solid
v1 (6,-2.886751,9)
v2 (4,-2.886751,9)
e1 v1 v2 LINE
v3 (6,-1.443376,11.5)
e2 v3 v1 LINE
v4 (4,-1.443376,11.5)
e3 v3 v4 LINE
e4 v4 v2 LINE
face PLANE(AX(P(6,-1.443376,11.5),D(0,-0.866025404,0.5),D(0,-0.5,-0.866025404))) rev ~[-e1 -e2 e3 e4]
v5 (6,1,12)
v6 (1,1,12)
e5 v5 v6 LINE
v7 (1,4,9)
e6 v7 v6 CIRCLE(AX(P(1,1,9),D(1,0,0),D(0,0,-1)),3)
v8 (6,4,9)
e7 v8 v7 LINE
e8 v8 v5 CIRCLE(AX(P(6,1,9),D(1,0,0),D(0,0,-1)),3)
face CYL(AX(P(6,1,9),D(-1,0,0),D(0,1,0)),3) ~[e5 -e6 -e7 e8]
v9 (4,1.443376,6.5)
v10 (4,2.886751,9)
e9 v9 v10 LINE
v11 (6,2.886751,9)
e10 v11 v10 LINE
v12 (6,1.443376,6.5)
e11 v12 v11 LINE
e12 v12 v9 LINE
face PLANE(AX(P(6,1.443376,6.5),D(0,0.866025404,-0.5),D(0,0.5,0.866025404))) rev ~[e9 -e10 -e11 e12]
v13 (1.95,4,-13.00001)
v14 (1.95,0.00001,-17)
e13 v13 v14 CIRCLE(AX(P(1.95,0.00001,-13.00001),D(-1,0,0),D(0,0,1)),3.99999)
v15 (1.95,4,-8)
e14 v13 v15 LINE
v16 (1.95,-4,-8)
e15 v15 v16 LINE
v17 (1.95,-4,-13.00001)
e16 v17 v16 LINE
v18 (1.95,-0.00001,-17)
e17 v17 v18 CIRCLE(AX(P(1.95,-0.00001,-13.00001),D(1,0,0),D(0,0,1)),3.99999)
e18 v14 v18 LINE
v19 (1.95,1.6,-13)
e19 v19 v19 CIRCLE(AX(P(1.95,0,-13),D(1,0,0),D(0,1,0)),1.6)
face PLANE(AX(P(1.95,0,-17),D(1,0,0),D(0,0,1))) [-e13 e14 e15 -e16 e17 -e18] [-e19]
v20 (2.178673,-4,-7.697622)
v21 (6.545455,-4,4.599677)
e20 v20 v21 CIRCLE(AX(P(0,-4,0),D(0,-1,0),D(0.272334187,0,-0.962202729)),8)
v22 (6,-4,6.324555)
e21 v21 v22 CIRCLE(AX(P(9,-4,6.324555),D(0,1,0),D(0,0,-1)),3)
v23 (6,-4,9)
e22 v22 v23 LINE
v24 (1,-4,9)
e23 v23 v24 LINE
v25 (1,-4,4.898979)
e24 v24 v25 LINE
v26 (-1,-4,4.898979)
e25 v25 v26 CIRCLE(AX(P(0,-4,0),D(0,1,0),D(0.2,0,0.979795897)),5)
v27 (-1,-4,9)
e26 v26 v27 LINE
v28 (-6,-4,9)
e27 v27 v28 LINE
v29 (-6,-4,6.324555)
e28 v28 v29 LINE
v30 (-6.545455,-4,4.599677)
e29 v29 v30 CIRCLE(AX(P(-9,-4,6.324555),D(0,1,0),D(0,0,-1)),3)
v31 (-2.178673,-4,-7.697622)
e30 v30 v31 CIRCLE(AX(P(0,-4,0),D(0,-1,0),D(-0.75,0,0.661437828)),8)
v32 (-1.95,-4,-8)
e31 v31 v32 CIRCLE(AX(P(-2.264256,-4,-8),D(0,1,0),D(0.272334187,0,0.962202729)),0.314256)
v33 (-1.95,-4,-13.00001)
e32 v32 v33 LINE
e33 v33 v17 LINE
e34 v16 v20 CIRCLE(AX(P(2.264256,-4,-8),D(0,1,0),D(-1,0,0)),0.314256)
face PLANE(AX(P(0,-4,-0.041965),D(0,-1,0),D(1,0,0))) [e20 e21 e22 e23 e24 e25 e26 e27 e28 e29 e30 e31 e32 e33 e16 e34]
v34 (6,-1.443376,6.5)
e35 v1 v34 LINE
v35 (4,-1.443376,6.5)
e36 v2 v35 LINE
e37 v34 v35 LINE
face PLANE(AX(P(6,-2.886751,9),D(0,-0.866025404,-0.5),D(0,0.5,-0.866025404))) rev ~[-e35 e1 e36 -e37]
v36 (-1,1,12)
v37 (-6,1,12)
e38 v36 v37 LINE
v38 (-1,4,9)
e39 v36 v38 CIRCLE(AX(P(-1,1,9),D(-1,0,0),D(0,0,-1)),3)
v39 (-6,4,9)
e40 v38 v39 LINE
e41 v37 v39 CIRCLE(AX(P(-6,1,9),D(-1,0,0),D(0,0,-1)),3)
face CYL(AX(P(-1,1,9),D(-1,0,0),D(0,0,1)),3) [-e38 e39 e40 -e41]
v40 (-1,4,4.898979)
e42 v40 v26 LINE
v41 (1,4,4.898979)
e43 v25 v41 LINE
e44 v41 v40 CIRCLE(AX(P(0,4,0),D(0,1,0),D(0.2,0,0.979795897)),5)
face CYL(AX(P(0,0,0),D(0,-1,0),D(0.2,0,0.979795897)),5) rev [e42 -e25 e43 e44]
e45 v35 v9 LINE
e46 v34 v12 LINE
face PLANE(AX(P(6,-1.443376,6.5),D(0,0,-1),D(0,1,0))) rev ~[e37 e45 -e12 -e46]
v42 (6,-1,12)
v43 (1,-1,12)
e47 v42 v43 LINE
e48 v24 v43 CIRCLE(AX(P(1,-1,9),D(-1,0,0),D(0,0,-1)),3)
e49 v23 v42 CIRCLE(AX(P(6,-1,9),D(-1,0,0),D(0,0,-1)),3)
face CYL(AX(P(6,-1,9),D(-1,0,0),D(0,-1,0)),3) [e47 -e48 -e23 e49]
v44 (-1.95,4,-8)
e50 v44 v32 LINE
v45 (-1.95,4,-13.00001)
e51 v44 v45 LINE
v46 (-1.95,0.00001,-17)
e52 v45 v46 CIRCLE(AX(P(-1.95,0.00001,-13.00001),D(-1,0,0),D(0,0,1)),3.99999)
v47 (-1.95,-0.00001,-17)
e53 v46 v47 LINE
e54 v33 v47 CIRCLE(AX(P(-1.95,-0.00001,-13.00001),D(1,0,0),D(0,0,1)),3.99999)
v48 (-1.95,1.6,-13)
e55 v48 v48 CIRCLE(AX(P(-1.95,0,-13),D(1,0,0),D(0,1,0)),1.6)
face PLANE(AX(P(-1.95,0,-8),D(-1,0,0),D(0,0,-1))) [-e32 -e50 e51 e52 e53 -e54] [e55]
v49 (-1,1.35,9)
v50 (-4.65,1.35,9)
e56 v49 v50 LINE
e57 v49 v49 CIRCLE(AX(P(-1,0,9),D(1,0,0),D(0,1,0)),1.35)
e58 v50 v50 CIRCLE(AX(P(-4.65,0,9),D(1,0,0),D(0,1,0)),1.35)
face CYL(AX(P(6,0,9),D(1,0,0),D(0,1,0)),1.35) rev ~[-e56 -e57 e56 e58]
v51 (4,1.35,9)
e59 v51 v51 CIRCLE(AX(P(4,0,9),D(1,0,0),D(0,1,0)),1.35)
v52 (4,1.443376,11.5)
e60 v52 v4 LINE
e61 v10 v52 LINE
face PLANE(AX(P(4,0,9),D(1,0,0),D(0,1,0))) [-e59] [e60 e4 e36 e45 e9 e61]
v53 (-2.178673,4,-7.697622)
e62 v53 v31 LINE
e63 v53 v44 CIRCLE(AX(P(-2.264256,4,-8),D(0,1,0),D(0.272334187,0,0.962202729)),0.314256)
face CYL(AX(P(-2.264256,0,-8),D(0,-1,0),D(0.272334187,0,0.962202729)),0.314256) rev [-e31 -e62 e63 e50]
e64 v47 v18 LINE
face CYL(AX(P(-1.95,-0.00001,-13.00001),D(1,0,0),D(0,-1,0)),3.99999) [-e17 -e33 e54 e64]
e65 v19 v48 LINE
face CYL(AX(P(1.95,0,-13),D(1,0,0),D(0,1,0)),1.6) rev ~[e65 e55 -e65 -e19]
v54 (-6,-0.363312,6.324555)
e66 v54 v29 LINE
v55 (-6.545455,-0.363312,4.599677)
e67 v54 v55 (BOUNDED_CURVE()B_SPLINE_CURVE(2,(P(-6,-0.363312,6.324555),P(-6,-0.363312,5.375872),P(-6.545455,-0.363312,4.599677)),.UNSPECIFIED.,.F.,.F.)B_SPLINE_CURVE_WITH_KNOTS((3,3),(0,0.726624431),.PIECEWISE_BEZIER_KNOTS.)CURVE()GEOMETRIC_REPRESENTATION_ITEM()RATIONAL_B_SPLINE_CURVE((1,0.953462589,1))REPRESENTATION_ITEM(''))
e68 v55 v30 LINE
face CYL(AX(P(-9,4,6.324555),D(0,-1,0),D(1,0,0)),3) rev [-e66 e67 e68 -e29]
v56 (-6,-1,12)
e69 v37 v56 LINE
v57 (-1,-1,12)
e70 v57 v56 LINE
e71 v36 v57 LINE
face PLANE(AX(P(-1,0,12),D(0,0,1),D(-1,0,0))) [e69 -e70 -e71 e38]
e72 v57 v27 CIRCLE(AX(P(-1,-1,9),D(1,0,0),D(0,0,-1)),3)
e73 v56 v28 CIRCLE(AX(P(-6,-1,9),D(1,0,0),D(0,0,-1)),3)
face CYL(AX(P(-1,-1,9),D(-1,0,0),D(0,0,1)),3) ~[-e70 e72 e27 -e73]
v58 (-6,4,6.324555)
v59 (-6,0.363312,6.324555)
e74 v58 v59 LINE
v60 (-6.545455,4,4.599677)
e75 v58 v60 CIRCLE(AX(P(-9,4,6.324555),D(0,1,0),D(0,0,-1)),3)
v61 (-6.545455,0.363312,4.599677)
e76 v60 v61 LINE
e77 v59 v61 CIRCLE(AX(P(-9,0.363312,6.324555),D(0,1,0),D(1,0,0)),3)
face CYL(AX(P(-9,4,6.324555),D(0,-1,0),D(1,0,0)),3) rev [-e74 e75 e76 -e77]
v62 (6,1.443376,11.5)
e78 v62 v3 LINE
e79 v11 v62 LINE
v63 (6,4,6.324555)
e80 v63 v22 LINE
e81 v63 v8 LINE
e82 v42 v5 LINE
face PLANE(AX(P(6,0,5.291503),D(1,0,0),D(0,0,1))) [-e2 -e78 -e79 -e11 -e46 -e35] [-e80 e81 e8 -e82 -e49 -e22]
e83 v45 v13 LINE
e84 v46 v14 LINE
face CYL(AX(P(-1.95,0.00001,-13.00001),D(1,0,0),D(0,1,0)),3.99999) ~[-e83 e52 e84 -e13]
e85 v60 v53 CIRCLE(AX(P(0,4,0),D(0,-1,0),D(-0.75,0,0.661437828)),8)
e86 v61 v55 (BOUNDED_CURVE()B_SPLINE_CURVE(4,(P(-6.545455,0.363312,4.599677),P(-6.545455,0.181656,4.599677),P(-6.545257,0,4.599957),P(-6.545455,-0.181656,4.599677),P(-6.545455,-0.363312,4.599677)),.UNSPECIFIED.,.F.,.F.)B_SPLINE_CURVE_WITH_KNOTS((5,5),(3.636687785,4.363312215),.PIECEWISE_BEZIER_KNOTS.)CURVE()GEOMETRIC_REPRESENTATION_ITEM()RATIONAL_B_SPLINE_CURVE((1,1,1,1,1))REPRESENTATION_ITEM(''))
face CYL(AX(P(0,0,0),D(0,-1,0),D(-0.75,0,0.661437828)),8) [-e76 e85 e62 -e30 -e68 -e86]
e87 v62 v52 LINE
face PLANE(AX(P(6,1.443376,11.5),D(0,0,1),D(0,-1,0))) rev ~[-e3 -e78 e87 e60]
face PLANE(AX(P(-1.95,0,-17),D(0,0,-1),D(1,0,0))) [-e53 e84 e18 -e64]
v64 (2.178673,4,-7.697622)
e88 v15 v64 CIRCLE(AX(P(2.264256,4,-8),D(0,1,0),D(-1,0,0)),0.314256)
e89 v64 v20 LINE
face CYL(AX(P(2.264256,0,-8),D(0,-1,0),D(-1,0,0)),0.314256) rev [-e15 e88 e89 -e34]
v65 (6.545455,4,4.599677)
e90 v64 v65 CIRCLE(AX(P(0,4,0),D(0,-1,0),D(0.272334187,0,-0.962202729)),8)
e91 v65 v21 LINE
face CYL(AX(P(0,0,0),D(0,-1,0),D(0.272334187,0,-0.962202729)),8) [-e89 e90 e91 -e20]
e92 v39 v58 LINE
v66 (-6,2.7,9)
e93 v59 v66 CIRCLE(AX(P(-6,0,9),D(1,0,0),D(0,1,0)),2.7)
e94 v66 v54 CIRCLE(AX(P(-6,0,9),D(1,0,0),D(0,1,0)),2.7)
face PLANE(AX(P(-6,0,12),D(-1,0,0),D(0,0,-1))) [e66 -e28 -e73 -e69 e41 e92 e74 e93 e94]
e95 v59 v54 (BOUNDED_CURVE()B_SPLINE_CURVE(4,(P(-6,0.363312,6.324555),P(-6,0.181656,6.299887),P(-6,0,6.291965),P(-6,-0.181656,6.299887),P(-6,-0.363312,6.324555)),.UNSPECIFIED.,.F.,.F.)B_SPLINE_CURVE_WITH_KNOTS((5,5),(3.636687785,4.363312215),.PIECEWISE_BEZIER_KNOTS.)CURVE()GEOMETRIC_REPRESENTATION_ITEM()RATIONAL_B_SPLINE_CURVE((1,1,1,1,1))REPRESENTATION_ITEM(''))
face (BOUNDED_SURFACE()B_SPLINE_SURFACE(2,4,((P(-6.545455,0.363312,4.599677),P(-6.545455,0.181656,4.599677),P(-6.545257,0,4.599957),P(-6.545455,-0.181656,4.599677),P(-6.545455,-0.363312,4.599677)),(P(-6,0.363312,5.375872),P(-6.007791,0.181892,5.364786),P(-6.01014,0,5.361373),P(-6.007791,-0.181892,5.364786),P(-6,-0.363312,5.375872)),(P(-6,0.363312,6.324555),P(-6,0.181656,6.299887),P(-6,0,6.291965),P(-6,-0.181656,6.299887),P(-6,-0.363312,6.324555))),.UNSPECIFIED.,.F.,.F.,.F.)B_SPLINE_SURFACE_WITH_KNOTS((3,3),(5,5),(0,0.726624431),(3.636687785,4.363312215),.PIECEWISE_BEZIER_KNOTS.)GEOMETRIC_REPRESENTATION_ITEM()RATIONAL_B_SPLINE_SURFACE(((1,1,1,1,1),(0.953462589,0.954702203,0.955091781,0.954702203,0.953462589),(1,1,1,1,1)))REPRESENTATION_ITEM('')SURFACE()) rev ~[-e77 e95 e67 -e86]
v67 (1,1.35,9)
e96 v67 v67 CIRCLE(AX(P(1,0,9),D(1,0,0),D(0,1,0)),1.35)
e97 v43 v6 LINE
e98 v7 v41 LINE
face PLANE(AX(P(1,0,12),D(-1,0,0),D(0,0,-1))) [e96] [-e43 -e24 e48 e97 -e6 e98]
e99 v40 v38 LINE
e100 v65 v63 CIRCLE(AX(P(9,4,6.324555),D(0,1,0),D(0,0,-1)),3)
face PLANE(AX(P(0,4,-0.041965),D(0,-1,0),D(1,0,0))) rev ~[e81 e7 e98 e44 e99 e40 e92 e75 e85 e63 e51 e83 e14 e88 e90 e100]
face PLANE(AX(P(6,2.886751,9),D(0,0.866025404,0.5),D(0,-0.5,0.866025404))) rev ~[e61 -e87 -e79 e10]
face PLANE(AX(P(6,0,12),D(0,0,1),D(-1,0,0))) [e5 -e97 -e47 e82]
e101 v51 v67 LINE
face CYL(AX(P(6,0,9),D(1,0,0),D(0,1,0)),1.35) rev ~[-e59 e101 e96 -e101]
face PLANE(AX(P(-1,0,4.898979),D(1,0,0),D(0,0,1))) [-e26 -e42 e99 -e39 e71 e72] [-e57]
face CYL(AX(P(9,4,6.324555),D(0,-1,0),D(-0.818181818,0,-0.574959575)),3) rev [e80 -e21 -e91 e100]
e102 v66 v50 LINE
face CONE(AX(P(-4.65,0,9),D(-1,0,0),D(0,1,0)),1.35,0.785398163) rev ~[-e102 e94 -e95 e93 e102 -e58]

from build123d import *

# Parameters (mm, degrees)
F1_DEPTH = 4
F2_R     = 1.35
F3_DEPTH = 25
F4_DEPTH = 2
F5_R     = 1.6
F6_DEPTH = 25
F7_SIZE  = 1.35
F8_R     = 3
F9_R     = 3.99999


# Not quite as in the source:
# - a fillet or chamfer is up to 0.001 mm smaller than in the source, because OpenCascade refuses the exact size
# - a feature names something its author has since deleted; it is built from what else it names


with BuildPart() as f1:
    # F0 (on Front) → F1 (new body, symmetric)
    with BuildSketch(Plane.XZ):
        with BuildLine():
            ThreePointArc((1, 4.8989794856), (0, -5), (-1, 4.8989794856))
            Line((-1, 4.8989794856), (-1, 12))
            Line((-1, 12), (-6, 12))
            Line((-6, 12), (-6, 5.2915026221))
            ThreePointArc((-6, 5.2915026221), (-7.6747647209, -2.257872113), (-2.1786734922, -7.6976218285))
            ThreePointArc((-2.1786734922, -7.6976218285), (-2.0136051919, -7.8104451764), (-1.95, -8))
            Line((-1.95, -8), (-1.95, -17))
            Line((-1.95, -17), (1.95, -17))
            Line((1.95, -17), (1.95, -8))
            ThreePointArc((1.95, -8), (2.0136051919, -7.8104451764), (2.1786734922, -7.6976218285))
            ThreePointArc((2.1786734922, -7.6976218285), (7.6747647209, -2.257872113), (6, 5.2915026221))
            Line((6, 5.2915026221), (6, 12))
            Line((6, 12), (1, 12))
            Line((1, 12), (1, 4.8989794856))
        make_face()
    extrude(amount=F1_DEPTH, both=True)

    # F2 (on face) → F3 (cut)
    with BuildSketch(Plane.YZ.offset(6)):
        with Locations((0, 9)):
            Circle(F2_R)
    extrude(amount=-F3_DEPTH, mode=Mode.SUBTRACT)

    # F2 (on face) → F4 (cut)
    with BuildSketch(Plane.YZ.offset(6)):
        Polygon((2.8867513459, 9), (1.443375673, 11.5), (-1.443375673, 11.5), (-2.8867513459, 9), (-1.443375673, 6.5), (1.443375673, 6.5), align=None)
        with Locations((0, 9)):
            Circle(F2_R, mode=Mode.SUBTRACT)
    extrude(amount=-F4_DEPTH, mode=Mode.SUBTRACT)

    # F5 (on face) → F6 (cut)
    with BuildSketch(Plane.YZ.offset(1.95)):
        with Locations((0, -13)):
            Circle(F5_R)
    extrude(amount=-F6_DEPTH, mode=Mode.SUBTRACT)

    # F7
    f7_edges = [f1.edges().sort_by_distance(p)[0] for p in [
        (-6, -1.35, 9),
    ]]
    chamfer(f7_edges, length=F7_SIZE)

    # F8
    f8_edges = [f1.edges().sort_by_distance(p)[0] for p in [
        (-3.5, -4, 12),
        (-3.5, 4, 12),
        (3.5, 4, 12),
        (3.5, -4, 12),
        (6, 0, 5.291503),
        (-6, 0, 5.291503),
    ]]
    fillet(f8_edges, radius=F8_R)

    # F9 (radius 4 in the source; OpenCascade refuses exactly that, so slightly less here)
    f9_edges = [f1.edges().sort_by_distance(p)[0] for p in [
        (0, -4, -17),
        (0, 4, -17),
    ]]
    fillet(f9_edges, radius=F9_R)


solid = f1.part
